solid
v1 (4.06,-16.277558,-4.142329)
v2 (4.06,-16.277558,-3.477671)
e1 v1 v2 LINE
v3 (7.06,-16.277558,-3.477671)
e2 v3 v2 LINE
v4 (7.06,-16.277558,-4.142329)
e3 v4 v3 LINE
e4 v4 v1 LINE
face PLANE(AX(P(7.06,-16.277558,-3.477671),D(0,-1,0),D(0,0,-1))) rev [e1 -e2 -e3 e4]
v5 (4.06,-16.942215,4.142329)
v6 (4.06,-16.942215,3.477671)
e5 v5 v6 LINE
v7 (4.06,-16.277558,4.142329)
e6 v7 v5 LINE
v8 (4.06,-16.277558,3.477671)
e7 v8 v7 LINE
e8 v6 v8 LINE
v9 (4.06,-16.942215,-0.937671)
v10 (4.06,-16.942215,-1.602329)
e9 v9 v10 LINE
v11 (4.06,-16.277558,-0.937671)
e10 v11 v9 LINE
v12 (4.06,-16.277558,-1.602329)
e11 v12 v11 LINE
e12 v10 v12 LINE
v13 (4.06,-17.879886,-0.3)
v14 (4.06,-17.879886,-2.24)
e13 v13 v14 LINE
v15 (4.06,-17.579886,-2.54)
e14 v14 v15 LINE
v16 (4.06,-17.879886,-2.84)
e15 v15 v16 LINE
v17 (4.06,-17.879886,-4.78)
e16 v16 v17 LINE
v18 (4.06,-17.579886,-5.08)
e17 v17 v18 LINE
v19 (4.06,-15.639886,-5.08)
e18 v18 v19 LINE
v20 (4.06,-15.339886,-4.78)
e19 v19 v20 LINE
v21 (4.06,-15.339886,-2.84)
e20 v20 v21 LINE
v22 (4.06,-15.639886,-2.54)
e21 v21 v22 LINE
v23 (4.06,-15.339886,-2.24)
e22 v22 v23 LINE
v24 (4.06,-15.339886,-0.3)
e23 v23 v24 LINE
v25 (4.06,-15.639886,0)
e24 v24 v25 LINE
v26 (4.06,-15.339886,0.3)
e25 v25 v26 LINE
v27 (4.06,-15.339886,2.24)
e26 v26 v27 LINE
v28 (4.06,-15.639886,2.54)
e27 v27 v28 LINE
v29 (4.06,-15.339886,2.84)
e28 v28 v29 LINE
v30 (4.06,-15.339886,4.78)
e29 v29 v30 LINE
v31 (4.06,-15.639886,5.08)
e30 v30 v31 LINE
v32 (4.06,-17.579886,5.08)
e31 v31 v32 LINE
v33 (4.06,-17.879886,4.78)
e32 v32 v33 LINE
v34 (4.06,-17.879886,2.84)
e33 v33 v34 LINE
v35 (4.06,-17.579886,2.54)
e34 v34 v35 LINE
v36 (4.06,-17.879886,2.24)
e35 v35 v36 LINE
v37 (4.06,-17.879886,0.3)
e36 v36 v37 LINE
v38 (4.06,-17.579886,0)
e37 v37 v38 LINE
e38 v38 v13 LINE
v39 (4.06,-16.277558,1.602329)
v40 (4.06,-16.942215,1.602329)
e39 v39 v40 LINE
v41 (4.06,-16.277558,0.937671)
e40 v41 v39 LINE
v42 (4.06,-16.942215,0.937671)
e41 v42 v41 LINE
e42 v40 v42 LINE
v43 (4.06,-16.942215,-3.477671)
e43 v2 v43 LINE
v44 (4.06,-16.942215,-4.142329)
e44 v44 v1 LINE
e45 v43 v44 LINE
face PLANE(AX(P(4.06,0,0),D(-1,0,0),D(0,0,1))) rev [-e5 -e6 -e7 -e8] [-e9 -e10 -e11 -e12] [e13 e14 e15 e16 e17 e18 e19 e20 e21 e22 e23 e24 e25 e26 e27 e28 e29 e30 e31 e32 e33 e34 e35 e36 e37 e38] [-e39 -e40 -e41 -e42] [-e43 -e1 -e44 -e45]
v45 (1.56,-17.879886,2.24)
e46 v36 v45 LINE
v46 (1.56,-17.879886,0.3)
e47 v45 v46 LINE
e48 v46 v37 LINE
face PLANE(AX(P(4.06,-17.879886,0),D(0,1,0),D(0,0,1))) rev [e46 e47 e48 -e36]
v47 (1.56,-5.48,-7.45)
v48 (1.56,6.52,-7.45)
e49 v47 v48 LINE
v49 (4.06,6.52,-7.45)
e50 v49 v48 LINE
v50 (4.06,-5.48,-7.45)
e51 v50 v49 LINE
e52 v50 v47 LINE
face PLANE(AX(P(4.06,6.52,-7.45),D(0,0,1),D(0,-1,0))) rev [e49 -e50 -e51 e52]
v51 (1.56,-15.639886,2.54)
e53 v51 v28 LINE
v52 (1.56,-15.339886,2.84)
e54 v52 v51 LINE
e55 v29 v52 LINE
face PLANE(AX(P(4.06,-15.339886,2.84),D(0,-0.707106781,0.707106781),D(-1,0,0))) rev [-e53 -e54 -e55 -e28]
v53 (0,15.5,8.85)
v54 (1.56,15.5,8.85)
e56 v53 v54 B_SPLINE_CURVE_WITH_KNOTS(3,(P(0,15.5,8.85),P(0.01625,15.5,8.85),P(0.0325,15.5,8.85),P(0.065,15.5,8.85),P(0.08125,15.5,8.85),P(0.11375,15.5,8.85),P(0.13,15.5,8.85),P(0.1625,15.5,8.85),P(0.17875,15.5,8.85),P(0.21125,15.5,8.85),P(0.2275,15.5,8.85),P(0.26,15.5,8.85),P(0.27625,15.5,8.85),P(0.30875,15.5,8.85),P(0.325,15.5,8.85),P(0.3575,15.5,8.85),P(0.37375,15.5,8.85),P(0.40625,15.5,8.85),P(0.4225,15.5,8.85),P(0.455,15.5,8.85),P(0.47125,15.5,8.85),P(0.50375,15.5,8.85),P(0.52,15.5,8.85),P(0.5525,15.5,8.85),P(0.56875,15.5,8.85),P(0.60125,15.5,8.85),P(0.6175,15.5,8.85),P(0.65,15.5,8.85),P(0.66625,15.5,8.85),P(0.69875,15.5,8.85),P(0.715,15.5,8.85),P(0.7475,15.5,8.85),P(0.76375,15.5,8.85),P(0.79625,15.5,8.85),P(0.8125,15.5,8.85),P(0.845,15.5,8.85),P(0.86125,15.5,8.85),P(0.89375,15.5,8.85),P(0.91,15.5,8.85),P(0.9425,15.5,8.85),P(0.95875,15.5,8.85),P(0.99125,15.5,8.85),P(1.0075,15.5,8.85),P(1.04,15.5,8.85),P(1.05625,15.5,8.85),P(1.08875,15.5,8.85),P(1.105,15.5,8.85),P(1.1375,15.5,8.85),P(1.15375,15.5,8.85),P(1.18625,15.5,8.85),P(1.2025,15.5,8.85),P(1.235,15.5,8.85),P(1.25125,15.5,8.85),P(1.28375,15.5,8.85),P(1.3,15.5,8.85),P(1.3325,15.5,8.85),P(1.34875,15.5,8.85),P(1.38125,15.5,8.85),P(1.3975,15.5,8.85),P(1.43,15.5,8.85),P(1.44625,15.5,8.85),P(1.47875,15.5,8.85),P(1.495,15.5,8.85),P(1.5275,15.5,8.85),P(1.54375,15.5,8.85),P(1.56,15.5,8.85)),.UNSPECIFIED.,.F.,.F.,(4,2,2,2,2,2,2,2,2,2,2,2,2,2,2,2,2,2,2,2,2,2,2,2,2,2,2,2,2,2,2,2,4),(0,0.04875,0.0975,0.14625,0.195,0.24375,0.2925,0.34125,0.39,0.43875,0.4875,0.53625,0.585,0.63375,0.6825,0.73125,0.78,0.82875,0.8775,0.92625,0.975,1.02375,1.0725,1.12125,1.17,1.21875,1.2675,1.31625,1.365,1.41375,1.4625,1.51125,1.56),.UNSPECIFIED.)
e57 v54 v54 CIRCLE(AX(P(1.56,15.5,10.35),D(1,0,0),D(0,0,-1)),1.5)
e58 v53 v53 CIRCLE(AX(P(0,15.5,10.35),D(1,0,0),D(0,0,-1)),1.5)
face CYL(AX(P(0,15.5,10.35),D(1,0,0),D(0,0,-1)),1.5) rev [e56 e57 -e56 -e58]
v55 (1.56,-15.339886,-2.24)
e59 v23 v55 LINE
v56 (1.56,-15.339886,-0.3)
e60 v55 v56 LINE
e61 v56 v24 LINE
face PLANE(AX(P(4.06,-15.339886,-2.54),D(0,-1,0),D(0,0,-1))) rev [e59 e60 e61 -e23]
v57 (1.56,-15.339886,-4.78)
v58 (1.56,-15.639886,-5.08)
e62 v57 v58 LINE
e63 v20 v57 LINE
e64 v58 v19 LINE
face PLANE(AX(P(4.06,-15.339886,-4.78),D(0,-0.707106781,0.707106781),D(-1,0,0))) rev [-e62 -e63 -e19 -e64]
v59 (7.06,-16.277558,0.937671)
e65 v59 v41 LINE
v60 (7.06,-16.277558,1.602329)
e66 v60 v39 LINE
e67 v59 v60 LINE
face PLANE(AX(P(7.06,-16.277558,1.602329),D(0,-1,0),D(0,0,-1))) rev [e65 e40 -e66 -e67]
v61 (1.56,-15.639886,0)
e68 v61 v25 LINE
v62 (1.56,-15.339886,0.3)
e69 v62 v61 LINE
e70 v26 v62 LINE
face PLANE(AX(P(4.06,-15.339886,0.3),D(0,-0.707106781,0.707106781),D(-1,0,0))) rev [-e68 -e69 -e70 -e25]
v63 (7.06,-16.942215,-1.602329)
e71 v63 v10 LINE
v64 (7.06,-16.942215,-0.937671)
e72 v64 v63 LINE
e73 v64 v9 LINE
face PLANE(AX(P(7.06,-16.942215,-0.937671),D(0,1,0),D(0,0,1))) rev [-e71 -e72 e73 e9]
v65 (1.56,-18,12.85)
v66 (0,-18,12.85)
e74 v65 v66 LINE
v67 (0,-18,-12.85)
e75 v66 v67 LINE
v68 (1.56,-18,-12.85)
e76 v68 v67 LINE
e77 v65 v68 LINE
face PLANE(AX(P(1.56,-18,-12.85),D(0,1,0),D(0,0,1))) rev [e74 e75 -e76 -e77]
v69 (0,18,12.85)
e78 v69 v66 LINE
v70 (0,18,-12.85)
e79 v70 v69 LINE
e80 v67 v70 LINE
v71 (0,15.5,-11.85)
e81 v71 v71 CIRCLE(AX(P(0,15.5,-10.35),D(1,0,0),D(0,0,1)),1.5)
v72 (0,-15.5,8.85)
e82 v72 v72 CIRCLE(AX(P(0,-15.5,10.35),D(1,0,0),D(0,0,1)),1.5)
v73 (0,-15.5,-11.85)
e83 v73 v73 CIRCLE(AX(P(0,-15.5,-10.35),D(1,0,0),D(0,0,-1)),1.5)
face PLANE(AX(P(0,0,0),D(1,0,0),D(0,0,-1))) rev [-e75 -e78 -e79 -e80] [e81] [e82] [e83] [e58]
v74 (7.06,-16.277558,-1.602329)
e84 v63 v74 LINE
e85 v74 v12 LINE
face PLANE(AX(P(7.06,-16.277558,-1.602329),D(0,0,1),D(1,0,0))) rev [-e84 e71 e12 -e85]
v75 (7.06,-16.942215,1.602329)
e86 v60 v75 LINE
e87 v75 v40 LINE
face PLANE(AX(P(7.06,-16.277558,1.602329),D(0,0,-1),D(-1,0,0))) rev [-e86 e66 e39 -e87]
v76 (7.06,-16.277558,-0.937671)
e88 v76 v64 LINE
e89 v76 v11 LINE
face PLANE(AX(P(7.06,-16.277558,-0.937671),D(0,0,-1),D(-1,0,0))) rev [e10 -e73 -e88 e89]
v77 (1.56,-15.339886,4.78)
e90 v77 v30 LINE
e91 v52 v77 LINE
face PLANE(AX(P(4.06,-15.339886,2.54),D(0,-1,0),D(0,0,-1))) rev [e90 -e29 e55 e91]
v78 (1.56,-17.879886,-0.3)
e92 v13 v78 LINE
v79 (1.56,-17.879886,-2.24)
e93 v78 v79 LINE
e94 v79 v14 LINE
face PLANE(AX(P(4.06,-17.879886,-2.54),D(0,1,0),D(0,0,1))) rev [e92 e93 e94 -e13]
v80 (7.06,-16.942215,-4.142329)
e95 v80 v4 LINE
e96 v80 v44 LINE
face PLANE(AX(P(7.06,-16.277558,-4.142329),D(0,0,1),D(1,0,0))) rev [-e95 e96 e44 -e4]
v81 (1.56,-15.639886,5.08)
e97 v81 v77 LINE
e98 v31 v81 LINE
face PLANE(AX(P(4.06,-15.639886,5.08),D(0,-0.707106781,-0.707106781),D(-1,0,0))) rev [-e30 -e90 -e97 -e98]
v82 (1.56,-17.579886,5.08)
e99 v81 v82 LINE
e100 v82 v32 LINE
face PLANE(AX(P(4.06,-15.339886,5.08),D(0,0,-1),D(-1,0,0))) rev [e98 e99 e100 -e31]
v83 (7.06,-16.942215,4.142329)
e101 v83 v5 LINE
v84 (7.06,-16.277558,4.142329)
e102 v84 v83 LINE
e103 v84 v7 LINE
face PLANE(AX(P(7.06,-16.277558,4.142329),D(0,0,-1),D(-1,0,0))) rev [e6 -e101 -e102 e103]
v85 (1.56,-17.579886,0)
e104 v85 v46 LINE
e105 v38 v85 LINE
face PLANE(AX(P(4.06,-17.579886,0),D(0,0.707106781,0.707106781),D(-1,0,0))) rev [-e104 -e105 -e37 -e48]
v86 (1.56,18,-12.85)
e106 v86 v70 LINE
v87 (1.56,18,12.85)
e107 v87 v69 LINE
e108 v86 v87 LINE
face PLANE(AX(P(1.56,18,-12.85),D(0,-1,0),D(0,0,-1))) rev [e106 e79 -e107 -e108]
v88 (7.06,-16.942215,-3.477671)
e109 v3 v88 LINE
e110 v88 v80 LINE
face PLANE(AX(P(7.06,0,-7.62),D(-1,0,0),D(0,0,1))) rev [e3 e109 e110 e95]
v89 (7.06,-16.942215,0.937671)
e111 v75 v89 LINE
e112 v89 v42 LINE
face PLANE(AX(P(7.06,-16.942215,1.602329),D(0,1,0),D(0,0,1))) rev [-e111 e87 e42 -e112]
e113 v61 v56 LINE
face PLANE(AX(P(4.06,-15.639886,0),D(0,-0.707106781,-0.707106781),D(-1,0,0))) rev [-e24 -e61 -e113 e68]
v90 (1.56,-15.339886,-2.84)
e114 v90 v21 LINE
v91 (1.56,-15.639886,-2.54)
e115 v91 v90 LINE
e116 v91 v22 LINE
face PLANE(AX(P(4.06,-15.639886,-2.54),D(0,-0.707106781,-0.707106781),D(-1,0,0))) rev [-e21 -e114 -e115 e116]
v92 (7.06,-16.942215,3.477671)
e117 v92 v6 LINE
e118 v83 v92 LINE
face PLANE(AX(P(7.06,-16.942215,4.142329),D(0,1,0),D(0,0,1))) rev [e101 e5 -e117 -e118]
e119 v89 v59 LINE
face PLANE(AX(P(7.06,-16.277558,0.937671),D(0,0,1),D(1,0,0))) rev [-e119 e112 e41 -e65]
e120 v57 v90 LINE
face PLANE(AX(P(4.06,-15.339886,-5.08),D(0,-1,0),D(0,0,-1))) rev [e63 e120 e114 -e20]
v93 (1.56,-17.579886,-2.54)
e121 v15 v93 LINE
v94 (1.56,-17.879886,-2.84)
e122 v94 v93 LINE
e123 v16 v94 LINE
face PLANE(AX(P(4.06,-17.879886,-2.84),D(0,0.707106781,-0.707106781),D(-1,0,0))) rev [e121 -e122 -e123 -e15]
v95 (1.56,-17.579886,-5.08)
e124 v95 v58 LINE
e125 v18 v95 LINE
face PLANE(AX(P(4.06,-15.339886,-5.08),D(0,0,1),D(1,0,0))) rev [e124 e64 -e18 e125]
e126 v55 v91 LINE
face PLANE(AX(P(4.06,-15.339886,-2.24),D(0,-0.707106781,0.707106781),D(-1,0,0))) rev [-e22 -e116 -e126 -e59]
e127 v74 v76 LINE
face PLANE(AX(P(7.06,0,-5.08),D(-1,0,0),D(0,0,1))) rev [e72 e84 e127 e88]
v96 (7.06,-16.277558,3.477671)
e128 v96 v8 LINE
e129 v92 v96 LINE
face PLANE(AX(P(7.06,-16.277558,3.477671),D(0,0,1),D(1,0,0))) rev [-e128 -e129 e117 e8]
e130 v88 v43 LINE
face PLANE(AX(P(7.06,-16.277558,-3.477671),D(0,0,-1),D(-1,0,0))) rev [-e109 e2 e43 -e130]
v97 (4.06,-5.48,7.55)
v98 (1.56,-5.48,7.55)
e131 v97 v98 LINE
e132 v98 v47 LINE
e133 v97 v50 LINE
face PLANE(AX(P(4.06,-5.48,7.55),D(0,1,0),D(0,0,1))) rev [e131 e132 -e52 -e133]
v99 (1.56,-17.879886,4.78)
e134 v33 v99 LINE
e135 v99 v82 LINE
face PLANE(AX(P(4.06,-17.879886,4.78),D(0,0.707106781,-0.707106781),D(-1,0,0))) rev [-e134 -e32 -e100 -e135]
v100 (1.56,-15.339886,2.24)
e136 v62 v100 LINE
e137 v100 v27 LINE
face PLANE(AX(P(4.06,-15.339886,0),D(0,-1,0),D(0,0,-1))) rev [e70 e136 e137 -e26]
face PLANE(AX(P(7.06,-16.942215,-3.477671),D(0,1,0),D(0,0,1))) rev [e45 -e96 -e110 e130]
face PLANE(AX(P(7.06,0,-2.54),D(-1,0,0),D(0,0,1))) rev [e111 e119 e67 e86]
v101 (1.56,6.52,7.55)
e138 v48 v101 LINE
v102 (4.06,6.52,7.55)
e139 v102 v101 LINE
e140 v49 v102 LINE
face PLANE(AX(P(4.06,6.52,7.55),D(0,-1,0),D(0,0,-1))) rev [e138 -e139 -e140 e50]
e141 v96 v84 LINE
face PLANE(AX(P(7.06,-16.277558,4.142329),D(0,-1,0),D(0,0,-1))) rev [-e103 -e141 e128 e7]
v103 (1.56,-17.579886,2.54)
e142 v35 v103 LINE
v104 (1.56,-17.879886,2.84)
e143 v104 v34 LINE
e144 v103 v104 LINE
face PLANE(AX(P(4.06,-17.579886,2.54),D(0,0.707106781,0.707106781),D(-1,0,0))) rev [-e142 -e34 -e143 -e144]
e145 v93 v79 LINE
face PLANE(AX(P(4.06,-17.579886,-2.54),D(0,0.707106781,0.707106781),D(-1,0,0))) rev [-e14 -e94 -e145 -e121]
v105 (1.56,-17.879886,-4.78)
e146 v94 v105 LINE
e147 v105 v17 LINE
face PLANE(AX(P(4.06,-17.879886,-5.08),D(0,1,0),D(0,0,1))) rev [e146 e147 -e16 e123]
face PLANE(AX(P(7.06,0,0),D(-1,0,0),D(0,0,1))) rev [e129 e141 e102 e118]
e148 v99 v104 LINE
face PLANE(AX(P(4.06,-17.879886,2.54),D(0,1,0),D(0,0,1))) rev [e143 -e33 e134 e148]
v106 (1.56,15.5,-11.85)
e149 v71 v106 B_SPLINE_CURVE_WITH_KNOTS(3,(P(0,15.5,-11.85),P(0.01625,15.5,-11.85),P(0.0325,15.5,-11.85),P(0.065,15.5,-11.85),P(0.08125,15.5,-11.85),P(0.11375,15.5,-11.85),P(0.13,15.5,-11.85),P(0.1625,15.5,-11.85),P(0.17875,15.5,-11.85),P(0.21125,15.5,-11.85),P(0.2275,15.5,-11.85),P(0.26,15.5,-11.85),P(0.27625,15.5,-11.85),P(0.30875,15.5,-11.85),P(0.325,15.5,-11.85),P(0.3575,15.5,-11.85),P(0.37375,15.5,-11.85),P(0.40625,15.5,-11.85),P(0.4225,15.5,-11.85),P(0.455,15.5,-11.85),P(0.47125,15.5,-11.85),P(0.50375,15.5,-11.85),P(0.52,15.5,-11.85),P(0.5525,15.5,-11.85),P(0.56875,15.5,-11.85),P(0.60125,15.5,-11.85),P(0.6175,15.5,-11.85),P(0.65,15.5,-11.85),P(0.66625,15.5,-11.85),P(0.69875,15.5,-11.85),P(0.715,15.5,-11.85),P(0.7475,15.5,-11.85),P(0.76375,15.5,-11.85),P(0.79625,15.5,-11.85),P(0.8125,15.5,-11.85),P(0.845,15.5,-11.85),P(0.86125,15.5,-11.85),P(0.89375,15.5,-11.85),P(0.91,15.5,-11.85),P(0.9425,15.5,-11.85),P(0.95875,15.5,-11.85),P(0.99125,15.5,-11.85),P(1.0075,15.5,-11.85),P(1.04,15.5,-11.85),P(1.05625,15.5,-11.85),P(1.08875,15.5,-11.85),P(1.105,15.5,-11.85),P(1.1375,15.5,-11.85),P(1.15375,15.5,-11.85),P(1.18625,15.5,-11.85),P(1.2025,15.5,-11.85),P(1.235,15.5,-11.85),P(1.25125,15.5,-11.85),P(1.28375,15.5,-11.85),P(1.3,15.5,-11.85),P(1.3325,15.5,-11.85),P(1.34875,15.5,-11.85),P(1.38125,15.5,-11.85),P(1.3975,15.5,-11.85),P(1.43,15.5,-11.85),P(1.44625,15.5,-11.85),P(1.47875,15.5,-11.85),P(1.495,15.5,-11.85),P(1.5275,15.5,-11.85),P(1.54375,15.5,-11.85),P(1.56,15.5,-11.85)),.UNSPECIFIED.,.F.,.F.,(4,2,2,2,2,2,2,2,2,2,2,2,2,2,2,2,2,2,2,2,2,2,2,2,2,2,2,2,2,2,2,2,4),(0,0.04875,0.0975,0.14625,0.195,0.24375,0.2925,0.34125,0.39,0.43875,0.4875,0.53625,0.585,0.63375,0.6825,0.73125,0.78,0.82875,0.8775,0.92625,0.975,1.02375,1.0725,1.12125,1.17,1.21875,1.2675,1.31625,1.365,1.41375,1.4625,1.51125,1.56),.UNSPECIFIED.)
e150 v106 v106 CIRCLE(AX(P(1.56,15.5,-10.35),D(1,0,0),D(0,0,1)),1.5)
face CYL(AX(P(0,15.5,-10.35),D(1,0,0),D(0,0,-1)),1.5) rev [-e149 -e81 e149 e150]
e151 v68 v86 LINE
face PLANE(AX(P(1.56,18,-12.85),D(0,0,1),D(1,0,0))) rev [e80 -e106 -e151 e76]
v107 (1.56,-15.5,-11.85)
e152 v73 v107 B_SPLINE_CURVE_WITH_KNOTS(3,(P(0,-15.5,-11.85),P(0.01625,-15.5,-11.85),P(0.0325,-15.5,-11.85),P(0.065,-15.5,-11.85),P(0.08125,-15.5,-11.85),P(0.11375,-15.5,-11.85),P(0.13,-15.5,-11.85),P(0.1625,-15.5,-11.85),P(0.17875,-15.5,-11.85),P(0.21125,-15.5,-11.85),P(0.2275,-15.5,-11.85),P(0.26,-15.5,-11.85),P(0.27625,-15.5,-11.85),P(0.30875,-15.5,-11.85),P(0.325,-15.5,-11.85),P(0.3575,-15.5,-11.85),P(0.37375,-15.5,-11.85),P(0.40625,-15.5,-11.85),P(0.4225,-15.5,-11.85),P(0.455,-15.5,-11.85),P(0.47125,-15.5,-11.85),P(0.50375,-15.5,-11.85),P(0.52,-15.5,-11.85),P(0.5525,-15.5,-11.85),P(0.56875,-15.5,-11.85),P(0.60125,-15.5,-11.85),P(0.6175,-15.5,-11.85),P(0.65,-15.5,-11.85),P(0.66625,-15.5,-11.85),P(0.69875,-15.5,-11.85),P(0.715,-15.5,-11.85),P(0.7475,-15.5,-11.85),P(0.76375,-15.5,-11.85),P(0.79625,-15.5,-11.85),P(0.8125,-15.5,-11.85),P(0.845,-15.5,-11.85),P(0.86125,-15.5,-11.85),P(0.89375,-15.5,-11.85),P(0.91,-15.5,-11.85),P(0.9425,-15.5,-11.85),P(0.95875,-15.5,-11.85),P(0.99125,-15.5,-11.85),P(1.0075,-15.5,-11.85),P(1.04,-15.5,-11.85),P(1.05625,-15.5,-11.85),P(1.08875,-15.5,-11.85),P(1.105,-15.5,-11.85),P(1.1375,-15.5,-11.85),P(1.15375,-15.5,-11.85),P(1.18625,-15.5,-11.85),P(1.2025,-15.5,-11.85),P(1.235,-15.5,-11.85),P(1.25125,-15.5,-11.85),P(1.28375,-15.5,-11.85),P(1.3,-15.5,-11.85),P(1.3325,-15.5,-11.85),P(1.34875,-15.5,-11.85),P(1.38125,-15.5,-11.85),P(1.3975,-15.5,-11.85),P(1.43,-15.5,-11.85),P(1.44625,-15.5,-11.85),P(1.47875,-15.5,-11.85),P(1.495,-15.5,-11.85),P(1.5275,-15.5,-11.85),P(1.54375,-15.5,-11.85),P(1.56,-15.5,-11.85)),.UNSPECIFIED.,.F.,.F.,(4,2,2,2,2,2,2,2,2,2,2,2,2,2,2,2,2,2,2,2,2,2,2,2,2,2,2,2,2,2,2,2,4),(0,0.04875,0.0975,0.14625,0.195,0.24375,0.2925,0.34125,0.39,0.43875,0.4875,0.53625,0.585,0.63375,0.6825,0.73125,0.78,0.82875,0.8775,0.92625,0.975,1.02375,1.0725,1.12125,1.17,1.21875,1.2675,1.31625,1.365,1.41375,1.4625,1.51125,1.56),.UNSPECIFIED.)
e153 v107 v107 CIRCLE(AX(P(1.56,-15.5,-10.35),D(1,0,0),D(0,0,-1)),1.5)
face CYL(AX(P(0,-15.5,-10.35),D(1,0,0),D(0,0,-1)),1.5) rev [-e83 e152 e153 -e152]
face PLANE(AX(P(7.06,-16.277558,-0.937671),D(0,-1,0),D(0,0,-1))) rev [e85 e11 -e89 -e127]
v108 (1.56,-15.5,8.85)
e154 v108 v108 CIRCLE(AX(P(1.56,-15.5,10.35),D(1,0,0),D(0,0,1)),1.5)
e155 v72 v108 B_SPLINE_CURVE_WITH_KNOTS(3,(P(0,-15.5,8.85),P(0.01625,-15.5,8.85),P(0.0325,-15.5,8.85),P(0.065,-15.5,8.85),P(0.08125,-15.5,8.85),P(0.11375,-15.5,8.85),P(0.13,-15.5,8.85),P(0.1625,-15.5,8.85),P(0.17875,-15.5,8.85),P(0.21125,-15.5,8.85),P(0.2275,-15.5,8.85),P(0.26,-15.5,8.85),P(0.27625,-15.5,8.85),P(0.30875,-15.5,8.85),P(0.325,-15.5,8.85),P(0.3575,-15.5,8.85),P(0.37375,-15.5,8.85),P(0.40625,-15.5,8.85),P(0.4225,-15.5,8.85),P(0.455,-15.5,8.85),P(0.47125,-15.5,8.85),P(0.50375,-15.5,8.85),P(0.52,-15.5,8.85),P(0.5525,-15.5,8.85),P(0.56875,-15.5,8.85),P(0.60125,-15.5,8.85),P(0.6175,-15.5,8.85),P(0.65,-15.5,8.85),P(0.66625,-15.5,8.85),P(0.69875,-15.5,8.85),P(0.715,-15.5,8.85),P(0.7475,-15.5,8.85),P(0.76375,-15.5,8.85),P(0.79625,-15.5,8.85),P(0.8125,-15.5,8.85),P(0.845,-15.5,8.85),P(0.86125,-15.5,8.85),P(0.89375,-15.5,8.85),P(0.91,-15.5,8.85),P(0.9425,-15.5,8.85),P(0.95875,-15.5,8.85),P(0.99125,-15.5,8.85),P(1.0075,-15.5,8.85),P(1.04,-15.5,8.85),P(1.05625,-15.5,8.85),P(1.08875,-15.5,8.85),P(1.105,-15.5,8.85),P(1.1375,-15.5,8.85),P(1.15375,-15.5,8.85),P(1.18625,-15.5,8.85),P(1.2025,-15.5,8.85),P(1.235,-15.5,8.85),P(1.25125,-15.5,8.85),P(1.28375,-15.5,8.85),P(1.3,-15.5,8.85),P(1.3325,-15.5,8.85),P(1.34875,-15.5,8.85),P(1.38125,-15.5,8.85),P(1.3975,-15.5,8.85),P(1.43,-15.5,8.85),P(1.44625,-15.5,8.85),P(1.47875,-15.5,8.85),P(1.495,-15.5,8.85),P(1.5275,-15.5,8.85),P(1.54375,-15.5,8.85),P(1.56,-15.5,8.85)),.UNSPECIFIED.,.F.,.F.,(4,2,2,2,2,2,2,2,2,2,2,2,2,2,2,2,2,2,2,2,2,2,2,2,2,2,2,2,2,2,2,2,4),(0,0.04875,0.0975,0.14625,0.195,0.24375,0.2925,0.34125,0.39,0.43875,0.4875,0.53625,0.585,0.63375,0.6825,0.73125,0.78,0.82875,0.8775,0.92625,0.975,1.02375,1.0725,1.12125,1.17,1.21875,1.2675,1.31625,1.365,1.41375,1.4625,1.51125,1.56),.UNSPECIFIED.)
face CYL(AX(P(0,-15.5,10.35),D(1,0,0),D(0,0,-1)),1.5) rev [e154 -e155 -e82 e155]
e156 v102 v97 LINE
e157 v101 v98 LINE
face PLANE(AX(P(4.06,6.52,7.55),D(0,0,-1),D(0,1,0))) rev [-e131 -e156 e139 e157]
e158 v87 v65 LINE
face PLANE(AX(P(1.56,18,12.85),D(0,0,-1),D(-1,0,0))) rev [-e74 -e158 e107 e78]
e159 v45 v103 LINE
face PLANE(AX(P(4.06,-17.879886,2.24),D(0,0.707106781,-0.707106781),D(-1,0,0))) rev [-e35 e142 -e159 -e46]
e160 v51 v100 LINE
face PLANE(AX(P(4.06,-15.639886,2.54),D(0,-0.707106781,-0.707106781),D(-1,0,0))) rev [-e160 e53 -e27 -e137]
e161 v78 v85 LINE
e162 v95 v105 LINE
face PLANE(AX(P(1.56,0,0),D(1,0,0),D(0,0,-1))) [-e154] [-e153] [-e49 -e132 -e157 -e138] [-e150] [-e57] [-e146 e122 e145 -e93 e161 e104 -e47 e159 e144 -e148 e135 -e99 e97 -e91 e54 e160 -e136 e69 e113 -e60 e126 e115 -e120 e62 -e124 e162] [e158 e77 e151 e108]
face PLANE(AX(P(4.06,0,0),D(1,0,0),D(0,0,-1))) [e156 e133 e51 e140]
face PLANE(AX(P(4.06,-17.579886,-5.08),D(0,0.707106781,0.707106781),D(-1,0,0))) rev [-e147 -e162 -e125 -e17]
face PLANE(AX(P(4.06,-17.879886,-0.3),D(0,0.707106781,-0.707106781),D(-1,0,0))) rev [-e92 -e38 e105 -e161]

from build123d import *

# Parameters (mm, degrees)
SKETCH_1_W             = 25.7
SKETCH_1_H             = 36
EXTRUDE_1_DEPTH        = 1.56
SKETCH_2_R             = 1.5
CUT_EXTRUDE_1_DEPTH    = 1.56
SKETCH_3_W             = 2.54
SKETCH_3_H             = 2.54
EXTRUDE_2_DEPTH        = 2.5
CHAMFER_1_SIZE         = 0.3
PATTERN_START          = 1.56
PATTERN_LINEAR_1_DEPTH = 2.5
SKETCH_4_W             = 15
SKETCH_4_H             = 12
EXTRUDE_3_DEPTH        = 2.5
SKETCH_5_W             = 0.664657546
SKETCH_5_H             = 0.664657545
EXTRUDE_4_DEPTH        = 3
PATTERN_LINEAR_2_COUNT = 4
PATTERN_LINEAR_2_PITCH = 2.54


# Read off the part's stored shape, not the designer's step: 阵列(线性)1
with BuildPart() as part:
    # 草图1 → 凸台-拉伸1 (new body)
    with BuildSketch(Plane(origin=(0, 0, 0), x_dir=(0, 0, -1), z_dir=(1, 0, 0))):
        Rectangle(SKETCH_1_W, SKETCH_1_H)
    extrude(amount=EXTRUDE_1_DEPTH)

    # 草图2 → 切除-拉伸1 (cut)
    with BuildSketch(Plane(origin=(1.56, 0, 0), x_dir=(0, 0, -1), z_dir=(1, 0, 0))):
        with Locations((-10.35, 15.5)):
            Circle(SKETCH_2_R)
        with Locations((10.35, 15.5)):
            Circle(SKETCH_2_R)
        with Locations((-10.35, -15.5)):
            Circle(SKETCH_2_R)
        with Locations((10.35, -15.5)):
            Circle(SKETCH_2_R)
    extrude(amount=-CUT_EXTRUDE_1_DEPTH, mode=Mode.SUBTRACT)

    # 草图3 → 凸台-拉伸2 (add)
    with BuildSketch(Plane(origin=(1.56, 0, 0), x_dir=(0, 0, -1), z_dir=(1, 0, 0))):
        with Locations((-3.81, -16.609886397)):
            Rectangle(SKETCH_3_W, SKETCH_3_H)
    extrude(amount=EXTRUDE_2_DEPTH)

    # 倒角1
    chamfer_1_edges = [part.edges().sort_by_distance(p)[0] for p in [
        (2.81, -17.879886397, 2.54),
        (2.81, -15.339886397, 2.54),
        (2.81, -15.339886397, 5.08),
        (2.81, -17.879886397, 5.08),
    ]]
    chamfer(chamfer_1_edges, length=CHAMFER_1_SIZE)

    # 阵列(线性)1 outline → 阵列(线性)1 (add)
    with BuildSketch(Plane.YZ.offset(PATTERN_START)):
        Polygon((-15.339886397, 0.3), (-15.339886397, 2.24), (-15.639886397, 2.54), (-17.579886397, 2.54), (-17.879886397, 2.24), (-17.879886397, 0.3), (-17.579886397, 0), (-17.879886397, -0.3), (-17.879886397, -2.24), (-17.579886397, -2.54), (-17.879886397, -2.84), (-17.879886397, -4.78), (-17.579886397, -5.08), (-15.639886397, -5.08), (-15.339886397, -4.78), (-15.339886397, -2.84), (-15.639886397, -2.54), (-15.339886397, -2.24), (-15.339886397, -0.3), (-15.639886397, 0), align=None)
    extrude(amount=PATTERN_LINEAR_1_DEPTH)

    # 草图4 → 凸台-拉伸3 (add)
    with BuildSketch(Plane(origin=(1.56, 0, 0), x_dir=(0, 0, -1), z_dir=(1, 0, 0))):
        with Locations((-0.05, 0.52)):
            Rectangle(SKETCH_4_W, SKETCH_4_H)
    extrude(amount=EXTRUDE_3_DEPTH)

    # 草图5 → 凸台-拉伸4 (add)
    with BuildSketch(Plane(origin=(4.06, 0, 0), x_dir=(0, 0, -1), z_dir=(1, 0, 0))):
        with Locations((-3.81, -16.609886397)):
            Rectangle(SKETCH_5_W, SKETCH_5_H)
    extrude_4 = extrude(amount=EXTRUDE_4_DEPTH)

    # 阵列(线性)2: 凸台-拉伸4 ×4
    with Locations(*[(0, 0, -i * PATTERN_LINEAR_2_PITCH) for i in range(1, PATTERN_LINEAR_2_COUNT)]):
        add(extrude_4)


solid = part.part
